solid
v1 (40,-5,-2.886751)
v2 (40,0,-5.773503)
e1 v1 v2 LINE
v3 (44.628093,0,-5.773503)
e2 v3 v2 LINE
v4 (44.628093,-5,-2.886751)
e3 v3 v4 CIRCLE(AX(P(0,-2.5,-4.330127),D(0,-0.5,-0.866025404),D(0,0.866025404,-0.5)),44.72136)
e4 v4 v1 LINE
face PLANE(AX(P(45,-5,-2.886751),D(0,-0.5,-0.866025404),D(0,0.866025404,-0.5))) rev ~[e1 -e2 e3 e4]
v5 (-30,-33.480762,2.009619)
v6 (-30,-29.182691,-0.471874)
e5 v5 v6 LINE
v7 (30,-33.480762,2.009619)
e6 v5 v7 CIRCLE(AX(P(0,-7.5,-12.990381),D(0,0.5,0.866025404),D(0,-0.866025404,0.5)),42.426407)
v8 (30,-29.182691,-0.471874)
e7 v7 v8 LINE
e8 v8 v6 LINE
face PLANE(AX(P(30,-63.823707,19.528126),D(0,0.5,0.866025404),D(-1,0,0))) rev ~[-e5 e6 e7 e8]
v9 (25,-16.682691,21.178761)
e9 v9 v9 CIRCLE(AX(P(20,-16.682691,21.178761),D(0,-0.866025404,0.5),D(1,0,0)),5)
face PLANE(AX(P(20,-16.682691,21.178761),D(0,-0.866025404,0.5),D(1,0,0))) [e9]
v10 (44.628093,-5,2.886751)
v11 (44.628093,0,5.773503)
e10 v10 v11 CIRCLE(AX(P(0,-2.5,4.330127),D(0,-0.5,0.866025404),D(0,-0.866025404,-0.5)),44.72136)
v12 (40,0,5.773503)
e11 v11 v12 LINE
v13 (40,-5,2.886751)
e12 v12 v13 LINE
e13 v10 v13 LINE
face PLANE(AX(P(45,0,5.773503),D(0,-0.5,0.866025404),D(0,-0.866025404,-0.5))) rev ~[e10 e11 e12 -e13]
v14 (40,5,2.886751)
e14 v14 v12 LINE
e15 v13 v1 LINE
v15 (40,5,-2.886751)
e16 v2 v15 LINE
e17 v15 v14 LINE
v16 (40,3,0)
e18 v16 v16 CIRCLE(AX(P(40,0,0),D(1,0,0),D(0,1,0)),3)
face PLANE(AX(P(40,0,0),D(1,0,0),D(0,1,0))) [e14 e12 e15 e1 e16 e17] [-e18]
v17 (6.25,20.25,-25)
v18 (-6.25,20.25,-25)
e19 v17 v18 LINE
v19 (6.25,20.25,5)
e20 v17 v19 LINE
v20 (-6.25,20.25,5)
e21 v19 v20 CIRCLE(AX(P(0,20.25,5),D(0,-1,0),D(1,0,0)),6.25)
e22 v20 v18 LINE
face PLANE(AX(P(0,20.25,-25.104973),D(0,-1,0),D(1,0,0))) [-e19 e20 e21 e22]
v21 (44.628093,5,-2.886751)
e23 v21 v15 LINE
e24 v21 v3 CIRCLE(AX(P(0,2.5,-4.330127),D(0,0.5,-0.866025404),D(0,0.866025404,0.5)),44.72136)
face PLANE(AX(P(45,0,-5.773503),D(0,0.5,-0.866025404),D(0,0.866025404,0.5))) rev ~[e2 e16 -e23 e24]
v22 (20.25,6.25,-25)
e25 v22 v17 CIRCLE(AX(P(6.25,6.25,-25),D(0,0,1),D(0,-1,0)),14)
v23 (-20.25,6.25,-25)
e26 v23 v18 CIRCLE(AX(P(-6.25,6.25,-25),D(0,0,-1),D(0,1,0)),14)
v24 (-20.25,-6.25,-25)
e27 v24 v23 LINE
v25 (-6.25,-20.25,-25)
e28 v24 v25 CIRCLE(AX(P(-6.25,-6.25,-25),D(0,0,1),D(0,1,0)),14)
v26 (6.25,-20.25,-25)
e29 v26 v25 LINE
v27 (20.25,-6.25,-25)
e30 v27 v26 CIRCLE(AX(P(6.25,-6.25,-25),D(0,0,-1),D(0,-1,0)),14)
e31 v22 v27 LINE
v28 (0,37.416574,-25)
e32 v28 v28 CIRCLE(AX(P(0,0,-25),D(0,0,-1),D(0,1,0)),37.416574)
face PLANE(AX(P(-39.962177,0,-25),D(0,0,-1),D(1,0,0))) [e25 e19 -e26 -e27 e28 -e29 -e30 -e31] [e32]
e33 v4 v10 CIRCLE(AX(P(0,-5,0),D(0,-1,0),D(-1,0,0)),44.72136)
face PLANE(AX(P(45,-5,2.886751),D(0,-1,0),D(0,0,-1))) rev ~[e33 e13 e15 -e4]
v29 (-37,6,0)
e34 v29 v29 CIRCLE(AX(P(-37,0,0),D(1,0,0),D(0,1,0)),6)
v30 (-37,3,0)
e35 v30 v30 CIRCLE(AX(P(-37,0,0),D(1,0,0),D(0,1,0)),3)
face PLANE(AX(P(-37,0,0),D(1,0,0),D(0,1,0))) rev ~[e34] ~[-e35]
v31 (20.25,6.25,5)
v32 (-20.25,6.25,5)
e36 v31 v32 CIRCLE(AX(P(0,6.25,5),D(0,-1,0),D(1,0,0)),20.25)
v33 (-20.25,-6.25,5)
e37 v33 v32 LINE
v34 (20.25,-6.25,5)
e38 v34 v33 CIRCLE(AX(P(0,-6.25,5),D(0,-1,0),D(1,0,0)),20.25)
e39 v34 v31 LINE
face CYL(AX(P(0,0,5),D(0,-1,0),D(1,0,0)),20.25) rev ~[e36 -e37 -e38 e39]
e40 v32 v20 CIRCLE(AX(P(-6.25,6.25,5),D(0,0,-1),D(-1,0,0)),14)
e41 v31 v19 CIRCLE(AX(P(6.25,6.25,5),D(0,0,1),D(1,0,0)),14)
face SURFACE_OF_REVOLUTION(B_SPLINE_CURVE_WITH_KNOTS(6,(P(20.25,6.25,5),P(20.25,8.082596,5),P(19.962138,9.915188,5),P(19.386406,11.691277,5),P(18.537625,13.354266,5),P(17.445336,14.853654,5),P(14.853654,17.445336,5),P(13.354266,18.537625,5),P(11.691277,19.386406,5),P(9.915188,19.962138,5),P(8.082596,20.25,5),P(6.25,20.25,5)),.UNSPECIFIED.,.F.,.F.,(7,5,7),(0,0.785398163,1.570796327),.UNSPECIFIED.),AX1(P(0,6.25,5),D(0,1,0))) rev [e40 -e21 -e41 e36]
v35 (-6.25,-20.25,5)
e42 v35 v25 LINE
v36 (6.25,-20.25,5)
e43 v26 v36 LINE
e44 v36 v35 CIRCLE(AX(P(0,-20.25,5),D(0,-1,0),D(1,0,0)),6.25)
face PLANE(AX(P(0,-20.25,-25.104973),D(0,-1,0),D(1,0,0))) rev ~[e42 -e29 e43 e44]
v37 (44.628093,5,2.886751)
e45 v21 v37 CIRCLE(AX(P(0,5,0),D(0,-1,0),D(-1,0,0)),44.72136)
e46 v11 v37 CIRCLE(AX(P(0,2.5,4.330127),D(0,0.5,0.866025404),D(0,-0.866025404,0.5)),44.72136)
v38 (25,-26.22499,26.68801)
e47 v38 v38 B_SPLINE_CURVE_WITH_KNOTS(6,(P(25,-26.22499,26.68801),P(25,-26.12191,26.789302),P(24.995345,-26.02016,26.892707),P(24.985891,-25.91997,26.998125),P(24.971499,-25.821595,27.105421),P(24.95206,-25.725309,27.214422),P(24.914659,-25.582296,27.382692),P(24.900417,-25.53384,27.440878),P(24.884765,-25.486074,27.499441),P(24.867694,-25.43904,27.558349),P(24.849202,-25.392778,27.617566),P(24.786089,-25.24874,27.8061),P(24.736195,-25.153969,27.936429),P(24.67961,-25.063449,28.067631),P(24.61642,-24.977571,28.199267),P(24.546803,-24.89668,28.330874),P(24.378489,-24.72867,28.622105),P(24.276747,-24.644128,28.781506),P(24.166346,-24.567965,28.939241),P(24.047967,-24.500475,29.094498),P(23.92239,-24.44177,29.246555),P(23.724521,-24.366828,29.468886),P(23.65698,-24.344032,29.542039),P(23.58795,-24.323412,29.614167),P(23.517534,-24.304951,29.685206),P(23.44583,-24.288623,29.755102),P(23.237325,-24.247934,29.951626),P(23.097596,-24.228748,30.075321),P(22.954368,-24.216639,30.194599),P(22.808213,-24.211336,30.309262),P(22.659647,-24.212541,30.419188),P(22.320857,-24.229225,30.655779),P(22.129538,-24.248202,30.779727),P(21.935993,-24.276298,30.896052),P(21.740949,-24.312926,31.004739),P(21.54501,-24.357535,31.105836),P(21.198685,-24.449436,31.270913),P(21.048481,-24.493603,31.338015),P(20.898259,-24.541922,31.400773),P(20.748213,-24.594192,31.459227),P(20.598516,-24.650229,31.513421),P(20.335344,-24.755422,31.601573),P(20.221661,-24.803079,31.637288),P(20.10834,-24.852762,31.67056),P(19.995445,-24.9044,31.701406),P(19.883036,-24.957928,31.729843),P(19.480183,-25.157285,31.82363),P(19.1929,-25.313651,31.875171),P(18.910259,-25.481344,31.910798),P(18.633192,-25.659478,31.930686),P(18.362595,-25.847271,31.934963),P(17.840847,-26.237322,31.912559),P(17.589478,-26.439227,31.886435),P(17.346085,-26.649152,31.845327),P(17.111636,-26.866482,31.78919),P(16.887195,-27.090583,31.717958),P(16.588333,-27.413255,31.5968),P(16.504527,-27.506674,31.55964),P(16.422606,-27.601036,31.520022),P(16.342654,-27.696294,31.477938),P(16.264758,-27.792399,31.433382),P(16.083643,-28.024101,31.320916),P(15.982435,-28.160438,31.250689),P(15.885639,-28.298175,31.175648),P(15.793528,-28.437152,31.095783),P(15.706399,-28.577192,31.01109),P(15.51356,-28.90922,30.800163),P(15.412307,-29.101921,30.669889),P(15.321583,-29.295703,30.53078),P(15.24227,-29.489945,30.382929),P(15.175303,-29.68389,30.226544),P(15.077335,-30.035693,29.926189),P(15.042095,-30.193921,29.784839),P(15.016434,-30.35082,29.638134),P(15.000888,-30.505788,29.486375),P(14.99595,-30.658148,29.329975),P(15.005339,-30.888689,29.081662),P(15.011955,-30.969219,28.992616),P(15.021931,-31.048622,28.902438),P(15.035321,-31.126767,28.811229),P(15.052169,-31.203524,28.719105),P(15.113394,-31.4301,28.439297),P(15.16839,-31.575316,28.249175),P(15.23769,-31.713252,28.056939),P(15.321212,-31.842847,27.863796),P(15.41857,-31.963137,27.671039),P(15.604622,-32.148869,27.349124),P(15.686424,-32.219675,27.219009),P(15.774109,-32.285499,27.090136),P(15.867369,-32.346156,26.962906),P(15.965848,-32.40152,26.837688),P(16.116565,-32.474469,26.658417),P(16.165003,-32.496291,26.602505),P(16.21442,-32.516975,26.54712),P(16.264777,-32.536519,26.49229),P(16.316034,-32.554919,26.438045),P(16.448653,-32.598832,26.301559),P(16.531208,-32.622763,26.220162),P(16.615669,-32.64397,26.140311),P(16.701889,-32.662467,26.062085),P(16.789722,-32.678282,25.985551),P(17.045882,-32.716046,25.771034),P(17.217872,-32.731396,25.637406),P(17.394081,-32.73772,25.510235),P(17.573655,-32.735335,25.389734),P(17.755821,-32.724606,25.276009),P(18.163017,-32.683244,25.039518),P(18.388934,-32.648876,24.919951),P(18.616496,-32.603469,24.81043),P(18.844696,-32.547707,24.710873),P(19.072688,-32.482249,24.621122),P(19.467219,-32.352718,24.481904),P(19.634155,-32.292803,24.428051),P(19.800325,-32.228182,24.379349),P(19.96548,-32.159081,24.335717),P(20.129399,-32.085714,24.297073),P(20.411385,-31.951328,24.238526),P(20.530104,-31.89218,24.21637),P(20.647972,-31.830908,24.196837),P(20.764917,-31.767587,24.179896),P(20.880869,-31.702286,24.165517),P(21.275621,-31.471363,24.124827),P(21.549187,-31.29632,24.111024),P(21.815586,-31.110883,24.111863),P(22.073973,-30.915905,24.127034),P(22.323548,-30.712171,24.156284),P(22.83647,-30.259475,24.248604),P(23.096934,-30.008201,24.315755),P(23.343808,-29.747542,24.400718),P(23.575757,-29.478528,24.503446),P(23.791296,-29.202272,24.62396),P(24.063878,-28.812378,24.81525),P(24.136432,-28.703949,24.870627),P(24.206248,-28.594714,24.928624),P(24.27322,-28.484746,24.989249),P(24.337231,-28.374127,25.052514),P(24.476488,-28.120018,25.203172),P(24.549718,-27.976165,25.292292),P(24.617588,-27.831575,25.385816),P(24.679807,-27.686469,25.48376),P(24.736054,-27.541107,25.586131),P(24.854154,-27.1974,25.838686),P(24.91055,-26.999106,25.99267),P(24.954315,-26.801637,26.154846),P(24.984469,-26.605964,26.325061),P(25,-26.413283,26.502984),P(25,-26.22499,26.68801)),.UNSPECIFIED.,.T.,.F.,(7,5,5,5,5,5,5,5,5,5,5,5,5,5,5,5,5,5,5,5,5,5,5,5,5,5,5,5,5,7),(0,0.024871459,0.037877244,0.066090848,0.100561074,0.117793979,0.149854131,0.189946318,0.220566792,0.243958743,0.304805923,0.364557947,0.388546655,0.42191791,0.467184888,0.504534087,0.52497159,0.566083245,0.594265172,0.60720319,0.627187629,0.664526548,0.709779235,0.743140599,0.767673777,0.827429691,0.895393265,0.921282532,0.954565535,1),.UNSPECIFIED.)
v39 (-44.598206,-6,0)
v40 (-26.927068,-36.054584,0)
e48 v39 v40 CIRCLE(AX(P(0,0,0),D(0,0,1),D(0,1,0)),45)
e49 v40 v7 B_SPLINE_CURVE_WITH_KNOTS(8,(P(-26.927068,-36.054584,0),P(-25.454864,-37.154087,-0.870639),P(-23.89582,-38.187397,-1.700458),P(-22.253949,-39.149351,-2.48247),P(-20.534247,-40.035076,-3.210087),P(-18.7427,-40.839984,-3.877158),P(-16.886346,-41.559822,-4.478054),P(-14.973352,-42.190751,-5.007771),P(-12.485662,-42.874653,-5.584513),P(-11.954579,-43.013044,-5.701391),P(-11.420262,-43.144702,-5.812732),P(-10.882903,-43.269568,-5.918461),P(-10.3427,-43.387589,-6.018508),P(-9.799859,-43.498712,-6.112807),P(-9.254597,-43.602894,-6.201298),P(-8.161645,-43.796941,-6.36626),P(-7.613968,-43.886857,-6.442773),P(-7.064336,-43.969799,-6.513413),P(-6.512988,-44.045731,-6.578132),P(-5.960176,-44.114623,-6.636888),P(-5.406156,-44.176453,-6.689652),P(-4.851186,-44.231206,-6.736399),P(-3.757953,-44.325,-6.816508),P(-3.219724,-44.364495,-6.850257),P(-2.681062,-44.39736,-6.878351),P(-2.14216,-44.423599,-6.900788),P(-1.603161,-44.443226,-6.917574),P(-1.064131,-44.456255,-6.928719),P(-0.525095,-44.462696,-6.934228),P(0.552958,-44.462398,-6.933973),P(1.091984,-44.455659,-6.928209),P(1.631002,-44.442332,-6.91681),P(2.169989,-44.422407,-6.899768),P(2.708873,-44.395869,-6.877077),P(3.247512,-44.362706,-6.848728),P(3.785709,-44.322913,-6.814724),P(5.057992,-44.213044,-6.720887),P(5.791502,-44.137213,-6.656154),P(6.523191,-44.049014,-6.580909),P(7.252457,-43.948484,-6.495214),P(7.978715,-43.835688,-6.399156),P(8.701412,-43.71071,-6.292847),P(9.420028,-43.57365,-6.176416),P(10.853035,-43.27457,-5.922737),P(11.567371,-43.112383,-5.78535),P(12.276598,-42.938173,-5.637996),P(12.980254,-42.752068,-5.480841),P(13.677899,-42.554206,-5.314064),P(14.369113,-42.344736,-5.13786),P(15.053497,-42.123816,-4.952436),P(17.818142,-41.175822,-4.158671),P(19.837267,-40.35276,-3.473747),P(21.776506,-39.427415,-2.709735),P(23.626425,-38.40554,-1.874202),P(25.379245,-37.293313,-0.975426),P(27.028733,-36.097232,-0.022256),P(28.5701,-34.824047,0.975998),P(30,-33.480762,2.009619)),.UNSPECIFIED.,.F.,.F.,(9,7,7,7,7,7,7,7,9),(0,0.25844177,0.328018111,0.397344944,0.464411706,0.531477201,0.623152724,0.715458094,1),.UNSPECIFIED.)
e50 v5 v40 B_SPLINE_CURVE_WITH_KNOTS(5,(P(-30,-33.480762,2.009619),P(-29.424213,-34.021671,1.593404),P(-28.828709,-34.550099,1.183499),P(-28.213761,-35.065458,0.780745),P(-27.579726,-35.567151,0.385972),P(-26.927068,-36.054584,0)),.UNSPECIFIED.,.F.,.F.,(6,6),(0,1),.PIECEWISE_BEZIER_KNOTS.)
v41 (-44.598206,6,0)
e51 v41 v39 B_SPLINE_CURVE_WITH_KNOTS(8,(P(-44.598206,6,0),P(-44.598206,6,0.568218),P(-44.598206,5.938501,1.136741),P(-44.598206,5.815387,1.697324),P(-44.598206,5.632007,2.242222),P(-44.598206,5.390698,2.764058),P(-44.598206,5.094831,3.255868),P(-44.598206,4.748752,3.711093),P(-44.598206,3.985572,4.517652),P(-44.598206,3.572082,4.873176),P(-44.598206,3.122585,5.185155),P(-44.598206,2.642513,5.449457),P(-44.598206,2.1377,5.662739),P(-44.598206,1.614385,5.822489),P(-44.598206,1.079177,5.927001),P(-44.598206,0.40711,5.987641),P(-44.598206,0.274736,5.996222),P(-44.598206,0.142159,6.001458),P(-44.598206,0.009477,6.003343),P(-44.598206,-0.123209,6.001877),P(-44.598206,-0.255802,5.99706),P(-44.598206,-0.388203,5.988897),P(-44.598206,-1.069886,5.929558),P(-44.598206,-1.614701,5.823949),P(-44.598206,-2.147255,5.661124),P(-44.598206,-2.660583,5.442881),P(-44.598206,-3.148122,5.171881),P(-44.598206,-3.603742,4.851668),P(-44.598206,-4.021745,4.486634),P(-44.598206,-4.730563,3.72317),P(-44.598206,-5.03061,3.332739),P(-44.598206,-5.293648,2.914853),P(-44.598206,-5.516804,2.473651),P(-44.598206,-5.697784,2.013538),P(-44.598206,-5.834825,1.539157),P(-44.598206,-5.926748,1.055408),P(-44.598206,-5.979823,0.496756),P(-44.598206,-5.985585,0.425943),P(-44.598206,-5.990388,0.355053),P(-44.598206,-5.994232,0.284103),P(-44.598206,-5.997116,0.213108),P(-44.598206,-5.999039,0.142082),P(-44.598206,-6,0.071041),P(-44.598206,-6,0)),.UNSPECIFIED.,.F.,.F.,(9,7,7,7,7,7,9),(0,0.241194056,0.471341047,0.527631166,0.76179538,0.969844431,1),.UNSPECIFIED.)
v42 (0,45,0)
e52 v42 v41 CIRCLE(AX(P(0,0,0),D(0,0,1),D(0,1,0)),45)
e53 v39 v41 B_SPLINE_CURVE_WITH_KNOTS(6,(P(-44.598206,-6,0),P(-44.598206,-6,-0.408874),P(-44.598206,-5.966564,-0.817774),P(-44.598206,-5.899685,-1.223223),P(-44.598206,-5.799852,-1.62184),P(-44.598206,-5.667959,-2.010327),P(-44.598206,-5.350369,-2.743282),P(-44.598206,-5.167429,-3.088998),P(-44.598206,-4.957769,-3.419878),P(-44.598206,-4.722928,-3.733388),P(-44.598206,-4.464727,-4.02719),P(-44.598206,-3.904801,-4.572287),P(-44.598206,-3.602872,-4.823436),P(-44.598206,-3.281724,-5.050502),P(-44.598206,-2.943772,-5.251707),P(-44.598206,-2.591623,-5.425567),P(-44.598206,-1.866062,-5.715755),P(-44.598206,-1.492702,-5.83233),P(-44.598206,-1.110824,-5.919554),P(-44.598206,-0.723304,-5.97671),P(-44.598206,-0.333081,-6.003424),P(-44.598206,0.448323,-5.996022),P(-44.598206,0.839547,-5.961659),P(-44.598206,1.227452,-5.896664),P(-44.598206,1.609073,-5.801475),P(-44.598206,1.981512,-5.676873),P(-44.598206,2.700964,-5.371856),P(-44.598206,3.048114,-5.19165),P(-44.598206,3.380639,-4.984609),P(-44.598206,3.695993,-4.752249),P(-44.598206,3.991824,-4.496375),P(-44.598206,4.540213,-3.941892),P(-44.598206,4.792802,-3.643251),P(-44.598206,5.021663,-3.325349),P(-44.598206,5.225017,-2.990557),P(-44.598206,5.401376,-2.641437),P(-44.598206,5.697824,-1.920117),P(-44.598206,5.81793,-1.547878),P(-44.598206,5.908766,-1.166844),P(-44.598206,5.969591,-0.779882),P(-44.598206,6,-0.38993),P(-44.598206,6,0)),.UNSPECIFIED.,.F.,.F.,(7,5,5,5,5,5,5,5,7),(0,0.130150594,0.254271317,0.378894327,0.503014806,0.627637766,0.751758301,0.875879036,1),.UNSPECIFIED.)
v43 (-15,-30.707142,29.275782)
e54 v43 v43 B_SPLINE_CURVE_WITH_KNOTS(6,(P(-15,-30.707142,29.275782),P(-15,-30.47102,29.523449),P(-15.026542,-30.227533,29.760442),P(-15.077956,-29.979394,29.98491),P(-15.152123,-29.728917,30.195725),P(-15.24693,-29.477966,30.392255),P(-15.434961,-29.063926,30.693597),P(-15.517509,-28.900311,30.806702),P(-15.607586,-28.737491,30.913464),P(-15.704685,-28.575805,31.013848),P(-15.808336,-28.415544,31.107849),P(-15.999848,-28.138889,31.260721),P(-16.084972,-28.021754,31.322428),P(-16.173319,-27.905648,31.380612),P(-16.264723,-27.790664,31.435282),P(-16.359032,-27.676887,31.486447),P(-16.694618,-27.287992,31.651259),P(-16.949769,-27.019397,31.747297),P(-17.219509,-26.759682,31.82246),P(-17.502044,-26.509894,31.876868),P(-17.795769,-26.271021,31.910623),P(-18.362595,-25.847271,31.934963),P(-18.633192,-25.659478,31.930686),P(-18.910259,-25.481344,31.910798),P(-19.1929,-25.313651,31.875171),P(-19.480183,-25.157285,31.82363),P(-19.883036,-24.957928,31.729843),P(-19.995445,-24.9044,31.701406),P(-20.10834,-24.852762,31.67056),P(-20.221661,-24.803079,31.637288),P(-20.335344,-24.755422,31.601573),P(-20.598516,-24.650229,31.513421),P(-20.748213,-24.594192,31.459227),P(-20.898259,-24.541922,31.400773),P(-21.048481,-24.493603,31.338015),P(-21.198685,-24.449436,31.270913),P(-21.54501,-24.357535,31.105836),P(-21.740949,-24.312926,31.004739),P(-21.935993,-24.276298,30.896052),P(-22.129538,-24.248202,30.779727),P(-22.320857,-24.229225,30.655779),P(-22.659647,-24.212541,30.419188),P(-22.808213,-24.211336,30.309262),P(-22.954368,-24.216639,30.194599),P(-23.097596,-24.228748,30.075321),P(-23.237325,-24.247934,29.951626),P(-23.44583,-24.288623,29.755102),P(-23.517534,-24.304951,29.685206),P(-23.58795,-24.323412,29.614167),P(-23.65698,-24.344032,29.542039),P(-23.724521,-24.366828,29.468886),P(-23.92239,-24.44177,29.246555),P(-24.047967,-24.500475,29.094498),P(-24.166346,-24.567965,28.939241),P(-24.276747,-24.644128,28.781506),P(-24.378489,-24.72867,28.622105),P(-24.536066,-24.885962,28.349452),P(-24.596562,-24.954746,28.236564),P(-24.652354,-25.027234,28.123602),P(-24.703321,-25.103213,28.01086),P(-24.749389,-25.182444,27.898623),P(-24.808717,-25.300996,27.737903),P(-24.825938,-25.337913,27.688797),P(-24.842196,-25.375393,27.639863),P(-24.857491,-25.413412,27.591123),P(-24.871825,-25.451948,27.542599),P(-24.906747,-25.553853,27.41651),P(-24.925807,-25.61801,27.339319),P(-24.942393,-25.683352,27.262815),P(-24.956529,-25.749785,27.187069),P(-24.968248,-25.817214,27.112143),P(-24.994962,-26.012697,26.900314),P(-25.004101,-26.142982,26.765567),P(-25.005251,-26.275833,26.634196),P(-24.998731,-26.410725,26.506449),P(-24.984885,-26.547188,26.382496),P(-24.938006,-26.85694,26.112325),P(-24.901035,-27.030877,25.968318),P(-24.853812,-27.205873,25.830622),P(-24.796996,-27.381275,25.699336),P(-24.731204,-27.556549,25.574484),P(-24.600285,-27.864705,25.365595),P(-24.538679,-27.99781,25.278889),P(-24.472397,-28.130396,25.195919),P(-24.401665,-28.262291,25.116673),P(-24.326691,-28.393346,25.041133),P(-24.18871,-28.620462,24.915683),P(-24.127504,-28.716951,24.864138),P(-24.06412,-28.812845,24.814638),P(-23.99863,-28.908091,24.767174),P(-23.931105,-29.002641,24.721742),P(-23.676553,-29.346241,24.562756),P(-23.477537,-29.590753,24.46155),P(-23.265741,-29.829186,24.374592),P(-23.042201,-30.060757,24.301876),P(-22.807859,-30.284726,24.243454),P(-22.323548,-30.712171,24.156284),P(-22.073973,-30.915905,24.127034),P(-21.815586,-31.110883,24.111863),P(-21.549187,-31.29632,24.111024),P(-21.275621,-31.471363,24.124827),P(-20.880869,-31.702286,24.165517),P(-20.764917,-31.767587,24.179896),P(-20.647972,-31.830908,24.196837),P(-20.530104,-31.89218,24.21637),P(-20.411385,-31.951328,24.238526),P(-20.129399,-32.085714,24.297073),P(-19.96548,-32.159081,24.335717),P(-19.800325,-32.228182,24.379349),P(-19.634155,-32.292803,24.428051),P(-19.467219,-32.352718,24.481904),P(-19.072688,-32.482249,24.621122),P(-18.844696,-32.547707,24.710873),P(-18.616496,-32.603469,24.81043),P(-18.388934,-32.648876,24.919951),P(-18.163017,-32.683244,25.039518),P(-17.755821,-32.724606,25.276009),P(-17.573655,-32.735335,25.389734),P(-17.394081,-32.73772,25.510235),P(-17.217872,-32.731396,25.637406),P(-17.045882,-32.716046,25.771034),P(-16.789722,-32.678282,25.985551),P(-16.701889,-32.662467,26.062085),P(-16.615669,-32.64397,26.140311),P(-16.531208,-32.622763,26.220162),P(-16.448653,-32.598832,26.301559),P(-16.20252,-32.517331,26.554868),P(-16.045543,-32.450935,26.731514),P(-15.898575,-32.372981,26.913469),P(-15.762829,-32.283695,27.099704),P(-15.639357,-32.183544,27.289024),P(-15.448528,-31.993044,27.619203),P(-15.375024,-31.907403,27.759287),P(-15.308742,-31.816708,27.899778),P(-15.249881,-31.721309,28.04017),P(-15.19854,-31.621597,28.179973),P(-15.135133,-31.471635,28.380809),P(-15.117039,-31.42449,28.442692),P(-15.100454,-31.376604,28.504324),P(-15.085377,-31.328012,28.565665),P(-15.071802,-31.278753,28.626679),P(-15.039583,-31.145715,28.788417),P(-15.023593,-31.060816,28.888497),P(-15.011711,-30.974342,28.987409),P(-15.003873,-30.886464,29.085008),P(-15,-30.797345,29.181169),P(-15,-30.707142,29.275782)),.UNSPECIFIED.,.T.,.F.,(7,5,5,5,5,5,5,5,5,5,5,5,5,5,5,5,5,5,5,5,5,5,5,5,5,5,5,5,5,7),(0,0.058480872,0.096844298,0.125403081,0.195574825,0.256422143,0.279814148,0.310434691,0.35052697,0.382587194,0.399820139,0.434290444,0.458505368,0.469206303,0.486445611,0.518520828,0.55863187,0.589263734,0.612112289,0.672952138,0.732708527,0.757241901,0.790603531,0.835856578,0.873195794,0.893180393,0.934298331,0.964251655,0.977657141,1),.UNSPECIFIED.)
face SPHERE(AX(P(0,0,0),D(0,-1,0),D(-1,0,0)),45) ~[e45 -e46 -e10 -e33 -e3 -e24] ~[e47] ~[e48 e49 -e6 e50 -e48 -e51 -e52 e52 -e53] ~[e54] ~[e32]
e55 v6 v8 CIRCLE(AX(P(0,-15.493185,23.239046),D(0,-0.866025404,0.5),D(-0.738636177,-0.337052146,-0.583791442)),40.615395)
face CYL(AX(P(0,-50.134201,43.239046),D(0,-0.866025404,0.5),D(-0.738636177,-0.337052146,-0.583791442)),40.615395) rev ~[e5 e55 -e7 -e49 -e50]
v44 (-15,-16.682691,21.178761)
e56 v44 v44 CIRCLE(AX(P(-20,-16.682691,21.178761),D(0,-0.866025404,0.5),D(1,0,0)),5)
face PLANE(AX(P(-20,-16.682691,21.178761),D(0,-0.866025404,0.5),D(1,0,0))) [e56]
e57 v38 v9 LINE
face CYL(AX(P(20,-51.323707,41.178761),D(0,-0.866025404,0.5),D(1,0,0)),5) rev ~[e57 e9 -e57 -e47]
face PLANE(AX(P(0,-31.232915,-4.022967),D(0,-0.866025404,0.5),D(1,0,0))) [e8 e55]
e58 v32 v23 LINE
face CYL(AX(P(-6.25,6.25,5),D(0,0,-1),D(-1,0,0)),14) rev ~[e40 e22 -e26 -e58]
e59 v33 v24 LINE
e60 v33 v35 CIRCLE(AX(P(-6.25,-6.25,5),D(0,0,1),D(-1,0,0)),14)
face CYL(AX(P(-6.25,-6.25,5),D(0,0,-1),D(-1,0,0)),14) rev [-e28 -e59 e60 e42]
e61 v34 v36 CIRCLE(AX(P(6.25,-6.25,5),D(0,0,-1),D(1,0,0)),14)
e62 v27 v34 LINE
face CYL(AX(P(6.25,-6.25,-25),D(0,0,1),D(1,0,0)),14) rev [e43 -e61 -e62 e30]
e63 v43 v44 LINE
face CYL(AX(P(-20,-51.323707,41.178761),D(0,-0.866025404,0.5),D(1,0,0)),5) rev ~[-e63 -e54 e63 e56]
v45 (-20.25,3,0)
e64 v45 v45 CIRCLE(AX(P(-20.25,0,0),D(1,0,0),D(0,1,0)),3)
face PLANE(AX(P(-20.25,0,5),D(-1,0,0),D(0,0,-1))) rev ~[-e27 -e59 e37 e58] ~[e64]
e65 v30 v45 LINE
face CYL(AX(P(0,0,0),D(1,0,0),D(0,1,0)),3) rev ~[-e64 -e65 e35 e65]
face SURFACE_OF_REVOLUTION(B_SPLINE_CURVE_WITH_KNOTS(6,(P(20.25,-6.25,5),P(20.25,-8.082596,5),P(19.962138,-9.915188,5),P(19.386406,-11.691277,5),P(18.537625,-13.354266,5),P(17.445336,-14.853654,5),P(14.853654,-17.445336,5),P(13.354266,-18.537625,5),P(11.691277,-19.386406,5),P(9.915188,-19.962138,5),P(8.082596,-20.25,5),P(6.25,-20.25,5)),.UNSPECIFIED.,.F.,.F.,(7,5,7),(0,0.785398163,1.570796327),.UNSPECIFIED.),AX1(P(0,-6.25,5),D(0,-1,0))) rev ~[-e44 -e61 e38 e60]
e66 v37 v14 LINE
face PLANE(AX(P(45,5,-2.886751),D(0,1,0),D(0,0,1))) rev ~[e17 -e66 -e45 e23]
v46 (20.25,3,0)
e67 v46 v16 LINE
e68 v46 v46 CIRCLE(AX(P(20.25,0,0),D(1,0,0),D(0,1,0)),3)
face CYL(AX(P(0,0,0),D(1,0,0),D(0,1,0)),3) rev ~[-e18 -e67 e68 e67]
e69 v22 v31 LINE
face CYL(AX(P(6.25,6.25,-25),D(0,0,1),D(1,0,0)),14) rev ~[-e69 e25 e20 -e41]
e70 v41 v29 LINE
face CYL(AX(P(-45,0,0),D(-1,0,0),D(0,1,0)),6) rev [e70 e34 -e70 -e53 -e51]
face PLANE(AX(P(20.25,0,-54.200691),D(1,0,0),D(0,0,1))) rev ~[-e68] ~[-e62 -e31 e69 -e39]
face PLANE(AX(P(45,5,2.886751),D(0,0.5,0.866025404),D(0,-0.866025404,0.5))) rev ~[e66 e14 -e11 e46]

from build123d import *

# Parameters (mm, degrees)
F2_W      = 90.5019028811
F2_H      = 17.7580579312
F3_DEPTH  = 40
F5_DEPTH  = 20.25
F6_R      = 3
F7_DEPTH  = 50
F8_R      = 14
F11_R     = 5
F12_DEPTH = 40
F15_R     = 6
F16_DEPTH = 8
F18_DEPTH = 5


with BuildPart() as f1:
    # F0 (on Top) → F1 (revolve)
    with BuildSketch(Plane.XY):
        with BuildLine():
            Line((0, -45), (0, 45))
            ThreePointArc((0, 45), (-45, 0), (0, -45))
        make_face()
    revolve(axis=Axis((0, 2.1741483361, 0), (0, 1, 0)))

    # F2 (on Front) → F3 (cut, symmetric)
    with BuildSketch(Plane.XZ):
        with Locations((5.2887741476, -33.8790289656)):
            Rectangle(F2_W, F2_H)
    extrude(amount=F3_DEPTH, both=True, mode=Mode.SUBTRACT)

    # F4 (on Front) → F5 (cut, symmetric)
    with BuildSketch(Plane.XZ):
        with BuildLine():
            Line((-20.25, 5), (-20.25, -54.200690622))
            Line((-20.25, -54.200690622), (20.25, -54.200690622))
            Line((20.25, -54.200690622), (20.25, 5))
            ThreePointArc((20.25, 5), (0, -15.25), (-20.25, 5))
        make_face()
        with BuildLine():
            ThreePointArc((20.25, 5), (0, 25.25), (-20.25, 5))
            Line((-20.25, 5), (20.25, 5))
        make_face()
        with BuildLine():
            Line((20.25, 5), (-20.25, 5))
            ThreePointArc((-20.25, 5), (0, -15.25), (20.25, 5))
        make_face()
    extrude(amount=F5_DEPTH, both=True, mode=Mode.SUBTRACT)

    # F6 (on Right) → F7 (cut, symmetric)
    with BuildSketch(Plane.YZ):
        Circle(F6_R)
    extrude(amount=F7_DEPTH, both=True, mode=Mode.SUBTRACT)

    # F8
    f8_edges = [f1.edges().sort_by_distance(p)[0] for p in [
        (-20.25, -20.25, -10),
        (-20.25, 20.25, -10),
        (20.25, -20.25, -10),
        (20.25, 20.25, -10),
        (0, -20.25, 25.25),
        (0, 20.25, 25.25),
    ]]
    fillet(f8_edges, radius=F8_R)

    # F11 (on face) → F12 (cut)
    with BuildSketch(Plane(origin=(0, -56.3237066798, 32.5185072133), x_dir=(1, 0, 0), z_dir=(0, -0.8660254038, 0.5))):
        with BuildLine():
            Line((30, -15), (-30, -15))
            ThreePointArc((-30, -15), (0, -28.2363828336), (30, -15))
        make_face()
        with Locations((-20, 10)):
            Circle(F11_R)
        with Locations((20, 10)):
            Circle(F11_R)
    extrude(amount=-F12_DEPTH, mode=Mode.SUBTRACT)

    # F15 (on offset) → F16 (cut)
    with BuildSketch(Plane.YZ.offset(-45)):
        Circle(F15_R)
    extrude(amount=F16_DEPTH, mode=Mode.SUBTRACT)

    # F17 (on offset) → F18 (cut)
    with BuildSketch(Plane.YZ.offset(45)):
        Polygon((5, -2.8867513459), (5, 2.8867513459), (0, 5.7735026919), (-5, 2.8867513459), (-5, -2.8867513459), (0, -5.7735026919), align=None)
    extrude(amount=-F18_DEPTH, mode=Mode.SUBTRACT)


solid = f1.part
